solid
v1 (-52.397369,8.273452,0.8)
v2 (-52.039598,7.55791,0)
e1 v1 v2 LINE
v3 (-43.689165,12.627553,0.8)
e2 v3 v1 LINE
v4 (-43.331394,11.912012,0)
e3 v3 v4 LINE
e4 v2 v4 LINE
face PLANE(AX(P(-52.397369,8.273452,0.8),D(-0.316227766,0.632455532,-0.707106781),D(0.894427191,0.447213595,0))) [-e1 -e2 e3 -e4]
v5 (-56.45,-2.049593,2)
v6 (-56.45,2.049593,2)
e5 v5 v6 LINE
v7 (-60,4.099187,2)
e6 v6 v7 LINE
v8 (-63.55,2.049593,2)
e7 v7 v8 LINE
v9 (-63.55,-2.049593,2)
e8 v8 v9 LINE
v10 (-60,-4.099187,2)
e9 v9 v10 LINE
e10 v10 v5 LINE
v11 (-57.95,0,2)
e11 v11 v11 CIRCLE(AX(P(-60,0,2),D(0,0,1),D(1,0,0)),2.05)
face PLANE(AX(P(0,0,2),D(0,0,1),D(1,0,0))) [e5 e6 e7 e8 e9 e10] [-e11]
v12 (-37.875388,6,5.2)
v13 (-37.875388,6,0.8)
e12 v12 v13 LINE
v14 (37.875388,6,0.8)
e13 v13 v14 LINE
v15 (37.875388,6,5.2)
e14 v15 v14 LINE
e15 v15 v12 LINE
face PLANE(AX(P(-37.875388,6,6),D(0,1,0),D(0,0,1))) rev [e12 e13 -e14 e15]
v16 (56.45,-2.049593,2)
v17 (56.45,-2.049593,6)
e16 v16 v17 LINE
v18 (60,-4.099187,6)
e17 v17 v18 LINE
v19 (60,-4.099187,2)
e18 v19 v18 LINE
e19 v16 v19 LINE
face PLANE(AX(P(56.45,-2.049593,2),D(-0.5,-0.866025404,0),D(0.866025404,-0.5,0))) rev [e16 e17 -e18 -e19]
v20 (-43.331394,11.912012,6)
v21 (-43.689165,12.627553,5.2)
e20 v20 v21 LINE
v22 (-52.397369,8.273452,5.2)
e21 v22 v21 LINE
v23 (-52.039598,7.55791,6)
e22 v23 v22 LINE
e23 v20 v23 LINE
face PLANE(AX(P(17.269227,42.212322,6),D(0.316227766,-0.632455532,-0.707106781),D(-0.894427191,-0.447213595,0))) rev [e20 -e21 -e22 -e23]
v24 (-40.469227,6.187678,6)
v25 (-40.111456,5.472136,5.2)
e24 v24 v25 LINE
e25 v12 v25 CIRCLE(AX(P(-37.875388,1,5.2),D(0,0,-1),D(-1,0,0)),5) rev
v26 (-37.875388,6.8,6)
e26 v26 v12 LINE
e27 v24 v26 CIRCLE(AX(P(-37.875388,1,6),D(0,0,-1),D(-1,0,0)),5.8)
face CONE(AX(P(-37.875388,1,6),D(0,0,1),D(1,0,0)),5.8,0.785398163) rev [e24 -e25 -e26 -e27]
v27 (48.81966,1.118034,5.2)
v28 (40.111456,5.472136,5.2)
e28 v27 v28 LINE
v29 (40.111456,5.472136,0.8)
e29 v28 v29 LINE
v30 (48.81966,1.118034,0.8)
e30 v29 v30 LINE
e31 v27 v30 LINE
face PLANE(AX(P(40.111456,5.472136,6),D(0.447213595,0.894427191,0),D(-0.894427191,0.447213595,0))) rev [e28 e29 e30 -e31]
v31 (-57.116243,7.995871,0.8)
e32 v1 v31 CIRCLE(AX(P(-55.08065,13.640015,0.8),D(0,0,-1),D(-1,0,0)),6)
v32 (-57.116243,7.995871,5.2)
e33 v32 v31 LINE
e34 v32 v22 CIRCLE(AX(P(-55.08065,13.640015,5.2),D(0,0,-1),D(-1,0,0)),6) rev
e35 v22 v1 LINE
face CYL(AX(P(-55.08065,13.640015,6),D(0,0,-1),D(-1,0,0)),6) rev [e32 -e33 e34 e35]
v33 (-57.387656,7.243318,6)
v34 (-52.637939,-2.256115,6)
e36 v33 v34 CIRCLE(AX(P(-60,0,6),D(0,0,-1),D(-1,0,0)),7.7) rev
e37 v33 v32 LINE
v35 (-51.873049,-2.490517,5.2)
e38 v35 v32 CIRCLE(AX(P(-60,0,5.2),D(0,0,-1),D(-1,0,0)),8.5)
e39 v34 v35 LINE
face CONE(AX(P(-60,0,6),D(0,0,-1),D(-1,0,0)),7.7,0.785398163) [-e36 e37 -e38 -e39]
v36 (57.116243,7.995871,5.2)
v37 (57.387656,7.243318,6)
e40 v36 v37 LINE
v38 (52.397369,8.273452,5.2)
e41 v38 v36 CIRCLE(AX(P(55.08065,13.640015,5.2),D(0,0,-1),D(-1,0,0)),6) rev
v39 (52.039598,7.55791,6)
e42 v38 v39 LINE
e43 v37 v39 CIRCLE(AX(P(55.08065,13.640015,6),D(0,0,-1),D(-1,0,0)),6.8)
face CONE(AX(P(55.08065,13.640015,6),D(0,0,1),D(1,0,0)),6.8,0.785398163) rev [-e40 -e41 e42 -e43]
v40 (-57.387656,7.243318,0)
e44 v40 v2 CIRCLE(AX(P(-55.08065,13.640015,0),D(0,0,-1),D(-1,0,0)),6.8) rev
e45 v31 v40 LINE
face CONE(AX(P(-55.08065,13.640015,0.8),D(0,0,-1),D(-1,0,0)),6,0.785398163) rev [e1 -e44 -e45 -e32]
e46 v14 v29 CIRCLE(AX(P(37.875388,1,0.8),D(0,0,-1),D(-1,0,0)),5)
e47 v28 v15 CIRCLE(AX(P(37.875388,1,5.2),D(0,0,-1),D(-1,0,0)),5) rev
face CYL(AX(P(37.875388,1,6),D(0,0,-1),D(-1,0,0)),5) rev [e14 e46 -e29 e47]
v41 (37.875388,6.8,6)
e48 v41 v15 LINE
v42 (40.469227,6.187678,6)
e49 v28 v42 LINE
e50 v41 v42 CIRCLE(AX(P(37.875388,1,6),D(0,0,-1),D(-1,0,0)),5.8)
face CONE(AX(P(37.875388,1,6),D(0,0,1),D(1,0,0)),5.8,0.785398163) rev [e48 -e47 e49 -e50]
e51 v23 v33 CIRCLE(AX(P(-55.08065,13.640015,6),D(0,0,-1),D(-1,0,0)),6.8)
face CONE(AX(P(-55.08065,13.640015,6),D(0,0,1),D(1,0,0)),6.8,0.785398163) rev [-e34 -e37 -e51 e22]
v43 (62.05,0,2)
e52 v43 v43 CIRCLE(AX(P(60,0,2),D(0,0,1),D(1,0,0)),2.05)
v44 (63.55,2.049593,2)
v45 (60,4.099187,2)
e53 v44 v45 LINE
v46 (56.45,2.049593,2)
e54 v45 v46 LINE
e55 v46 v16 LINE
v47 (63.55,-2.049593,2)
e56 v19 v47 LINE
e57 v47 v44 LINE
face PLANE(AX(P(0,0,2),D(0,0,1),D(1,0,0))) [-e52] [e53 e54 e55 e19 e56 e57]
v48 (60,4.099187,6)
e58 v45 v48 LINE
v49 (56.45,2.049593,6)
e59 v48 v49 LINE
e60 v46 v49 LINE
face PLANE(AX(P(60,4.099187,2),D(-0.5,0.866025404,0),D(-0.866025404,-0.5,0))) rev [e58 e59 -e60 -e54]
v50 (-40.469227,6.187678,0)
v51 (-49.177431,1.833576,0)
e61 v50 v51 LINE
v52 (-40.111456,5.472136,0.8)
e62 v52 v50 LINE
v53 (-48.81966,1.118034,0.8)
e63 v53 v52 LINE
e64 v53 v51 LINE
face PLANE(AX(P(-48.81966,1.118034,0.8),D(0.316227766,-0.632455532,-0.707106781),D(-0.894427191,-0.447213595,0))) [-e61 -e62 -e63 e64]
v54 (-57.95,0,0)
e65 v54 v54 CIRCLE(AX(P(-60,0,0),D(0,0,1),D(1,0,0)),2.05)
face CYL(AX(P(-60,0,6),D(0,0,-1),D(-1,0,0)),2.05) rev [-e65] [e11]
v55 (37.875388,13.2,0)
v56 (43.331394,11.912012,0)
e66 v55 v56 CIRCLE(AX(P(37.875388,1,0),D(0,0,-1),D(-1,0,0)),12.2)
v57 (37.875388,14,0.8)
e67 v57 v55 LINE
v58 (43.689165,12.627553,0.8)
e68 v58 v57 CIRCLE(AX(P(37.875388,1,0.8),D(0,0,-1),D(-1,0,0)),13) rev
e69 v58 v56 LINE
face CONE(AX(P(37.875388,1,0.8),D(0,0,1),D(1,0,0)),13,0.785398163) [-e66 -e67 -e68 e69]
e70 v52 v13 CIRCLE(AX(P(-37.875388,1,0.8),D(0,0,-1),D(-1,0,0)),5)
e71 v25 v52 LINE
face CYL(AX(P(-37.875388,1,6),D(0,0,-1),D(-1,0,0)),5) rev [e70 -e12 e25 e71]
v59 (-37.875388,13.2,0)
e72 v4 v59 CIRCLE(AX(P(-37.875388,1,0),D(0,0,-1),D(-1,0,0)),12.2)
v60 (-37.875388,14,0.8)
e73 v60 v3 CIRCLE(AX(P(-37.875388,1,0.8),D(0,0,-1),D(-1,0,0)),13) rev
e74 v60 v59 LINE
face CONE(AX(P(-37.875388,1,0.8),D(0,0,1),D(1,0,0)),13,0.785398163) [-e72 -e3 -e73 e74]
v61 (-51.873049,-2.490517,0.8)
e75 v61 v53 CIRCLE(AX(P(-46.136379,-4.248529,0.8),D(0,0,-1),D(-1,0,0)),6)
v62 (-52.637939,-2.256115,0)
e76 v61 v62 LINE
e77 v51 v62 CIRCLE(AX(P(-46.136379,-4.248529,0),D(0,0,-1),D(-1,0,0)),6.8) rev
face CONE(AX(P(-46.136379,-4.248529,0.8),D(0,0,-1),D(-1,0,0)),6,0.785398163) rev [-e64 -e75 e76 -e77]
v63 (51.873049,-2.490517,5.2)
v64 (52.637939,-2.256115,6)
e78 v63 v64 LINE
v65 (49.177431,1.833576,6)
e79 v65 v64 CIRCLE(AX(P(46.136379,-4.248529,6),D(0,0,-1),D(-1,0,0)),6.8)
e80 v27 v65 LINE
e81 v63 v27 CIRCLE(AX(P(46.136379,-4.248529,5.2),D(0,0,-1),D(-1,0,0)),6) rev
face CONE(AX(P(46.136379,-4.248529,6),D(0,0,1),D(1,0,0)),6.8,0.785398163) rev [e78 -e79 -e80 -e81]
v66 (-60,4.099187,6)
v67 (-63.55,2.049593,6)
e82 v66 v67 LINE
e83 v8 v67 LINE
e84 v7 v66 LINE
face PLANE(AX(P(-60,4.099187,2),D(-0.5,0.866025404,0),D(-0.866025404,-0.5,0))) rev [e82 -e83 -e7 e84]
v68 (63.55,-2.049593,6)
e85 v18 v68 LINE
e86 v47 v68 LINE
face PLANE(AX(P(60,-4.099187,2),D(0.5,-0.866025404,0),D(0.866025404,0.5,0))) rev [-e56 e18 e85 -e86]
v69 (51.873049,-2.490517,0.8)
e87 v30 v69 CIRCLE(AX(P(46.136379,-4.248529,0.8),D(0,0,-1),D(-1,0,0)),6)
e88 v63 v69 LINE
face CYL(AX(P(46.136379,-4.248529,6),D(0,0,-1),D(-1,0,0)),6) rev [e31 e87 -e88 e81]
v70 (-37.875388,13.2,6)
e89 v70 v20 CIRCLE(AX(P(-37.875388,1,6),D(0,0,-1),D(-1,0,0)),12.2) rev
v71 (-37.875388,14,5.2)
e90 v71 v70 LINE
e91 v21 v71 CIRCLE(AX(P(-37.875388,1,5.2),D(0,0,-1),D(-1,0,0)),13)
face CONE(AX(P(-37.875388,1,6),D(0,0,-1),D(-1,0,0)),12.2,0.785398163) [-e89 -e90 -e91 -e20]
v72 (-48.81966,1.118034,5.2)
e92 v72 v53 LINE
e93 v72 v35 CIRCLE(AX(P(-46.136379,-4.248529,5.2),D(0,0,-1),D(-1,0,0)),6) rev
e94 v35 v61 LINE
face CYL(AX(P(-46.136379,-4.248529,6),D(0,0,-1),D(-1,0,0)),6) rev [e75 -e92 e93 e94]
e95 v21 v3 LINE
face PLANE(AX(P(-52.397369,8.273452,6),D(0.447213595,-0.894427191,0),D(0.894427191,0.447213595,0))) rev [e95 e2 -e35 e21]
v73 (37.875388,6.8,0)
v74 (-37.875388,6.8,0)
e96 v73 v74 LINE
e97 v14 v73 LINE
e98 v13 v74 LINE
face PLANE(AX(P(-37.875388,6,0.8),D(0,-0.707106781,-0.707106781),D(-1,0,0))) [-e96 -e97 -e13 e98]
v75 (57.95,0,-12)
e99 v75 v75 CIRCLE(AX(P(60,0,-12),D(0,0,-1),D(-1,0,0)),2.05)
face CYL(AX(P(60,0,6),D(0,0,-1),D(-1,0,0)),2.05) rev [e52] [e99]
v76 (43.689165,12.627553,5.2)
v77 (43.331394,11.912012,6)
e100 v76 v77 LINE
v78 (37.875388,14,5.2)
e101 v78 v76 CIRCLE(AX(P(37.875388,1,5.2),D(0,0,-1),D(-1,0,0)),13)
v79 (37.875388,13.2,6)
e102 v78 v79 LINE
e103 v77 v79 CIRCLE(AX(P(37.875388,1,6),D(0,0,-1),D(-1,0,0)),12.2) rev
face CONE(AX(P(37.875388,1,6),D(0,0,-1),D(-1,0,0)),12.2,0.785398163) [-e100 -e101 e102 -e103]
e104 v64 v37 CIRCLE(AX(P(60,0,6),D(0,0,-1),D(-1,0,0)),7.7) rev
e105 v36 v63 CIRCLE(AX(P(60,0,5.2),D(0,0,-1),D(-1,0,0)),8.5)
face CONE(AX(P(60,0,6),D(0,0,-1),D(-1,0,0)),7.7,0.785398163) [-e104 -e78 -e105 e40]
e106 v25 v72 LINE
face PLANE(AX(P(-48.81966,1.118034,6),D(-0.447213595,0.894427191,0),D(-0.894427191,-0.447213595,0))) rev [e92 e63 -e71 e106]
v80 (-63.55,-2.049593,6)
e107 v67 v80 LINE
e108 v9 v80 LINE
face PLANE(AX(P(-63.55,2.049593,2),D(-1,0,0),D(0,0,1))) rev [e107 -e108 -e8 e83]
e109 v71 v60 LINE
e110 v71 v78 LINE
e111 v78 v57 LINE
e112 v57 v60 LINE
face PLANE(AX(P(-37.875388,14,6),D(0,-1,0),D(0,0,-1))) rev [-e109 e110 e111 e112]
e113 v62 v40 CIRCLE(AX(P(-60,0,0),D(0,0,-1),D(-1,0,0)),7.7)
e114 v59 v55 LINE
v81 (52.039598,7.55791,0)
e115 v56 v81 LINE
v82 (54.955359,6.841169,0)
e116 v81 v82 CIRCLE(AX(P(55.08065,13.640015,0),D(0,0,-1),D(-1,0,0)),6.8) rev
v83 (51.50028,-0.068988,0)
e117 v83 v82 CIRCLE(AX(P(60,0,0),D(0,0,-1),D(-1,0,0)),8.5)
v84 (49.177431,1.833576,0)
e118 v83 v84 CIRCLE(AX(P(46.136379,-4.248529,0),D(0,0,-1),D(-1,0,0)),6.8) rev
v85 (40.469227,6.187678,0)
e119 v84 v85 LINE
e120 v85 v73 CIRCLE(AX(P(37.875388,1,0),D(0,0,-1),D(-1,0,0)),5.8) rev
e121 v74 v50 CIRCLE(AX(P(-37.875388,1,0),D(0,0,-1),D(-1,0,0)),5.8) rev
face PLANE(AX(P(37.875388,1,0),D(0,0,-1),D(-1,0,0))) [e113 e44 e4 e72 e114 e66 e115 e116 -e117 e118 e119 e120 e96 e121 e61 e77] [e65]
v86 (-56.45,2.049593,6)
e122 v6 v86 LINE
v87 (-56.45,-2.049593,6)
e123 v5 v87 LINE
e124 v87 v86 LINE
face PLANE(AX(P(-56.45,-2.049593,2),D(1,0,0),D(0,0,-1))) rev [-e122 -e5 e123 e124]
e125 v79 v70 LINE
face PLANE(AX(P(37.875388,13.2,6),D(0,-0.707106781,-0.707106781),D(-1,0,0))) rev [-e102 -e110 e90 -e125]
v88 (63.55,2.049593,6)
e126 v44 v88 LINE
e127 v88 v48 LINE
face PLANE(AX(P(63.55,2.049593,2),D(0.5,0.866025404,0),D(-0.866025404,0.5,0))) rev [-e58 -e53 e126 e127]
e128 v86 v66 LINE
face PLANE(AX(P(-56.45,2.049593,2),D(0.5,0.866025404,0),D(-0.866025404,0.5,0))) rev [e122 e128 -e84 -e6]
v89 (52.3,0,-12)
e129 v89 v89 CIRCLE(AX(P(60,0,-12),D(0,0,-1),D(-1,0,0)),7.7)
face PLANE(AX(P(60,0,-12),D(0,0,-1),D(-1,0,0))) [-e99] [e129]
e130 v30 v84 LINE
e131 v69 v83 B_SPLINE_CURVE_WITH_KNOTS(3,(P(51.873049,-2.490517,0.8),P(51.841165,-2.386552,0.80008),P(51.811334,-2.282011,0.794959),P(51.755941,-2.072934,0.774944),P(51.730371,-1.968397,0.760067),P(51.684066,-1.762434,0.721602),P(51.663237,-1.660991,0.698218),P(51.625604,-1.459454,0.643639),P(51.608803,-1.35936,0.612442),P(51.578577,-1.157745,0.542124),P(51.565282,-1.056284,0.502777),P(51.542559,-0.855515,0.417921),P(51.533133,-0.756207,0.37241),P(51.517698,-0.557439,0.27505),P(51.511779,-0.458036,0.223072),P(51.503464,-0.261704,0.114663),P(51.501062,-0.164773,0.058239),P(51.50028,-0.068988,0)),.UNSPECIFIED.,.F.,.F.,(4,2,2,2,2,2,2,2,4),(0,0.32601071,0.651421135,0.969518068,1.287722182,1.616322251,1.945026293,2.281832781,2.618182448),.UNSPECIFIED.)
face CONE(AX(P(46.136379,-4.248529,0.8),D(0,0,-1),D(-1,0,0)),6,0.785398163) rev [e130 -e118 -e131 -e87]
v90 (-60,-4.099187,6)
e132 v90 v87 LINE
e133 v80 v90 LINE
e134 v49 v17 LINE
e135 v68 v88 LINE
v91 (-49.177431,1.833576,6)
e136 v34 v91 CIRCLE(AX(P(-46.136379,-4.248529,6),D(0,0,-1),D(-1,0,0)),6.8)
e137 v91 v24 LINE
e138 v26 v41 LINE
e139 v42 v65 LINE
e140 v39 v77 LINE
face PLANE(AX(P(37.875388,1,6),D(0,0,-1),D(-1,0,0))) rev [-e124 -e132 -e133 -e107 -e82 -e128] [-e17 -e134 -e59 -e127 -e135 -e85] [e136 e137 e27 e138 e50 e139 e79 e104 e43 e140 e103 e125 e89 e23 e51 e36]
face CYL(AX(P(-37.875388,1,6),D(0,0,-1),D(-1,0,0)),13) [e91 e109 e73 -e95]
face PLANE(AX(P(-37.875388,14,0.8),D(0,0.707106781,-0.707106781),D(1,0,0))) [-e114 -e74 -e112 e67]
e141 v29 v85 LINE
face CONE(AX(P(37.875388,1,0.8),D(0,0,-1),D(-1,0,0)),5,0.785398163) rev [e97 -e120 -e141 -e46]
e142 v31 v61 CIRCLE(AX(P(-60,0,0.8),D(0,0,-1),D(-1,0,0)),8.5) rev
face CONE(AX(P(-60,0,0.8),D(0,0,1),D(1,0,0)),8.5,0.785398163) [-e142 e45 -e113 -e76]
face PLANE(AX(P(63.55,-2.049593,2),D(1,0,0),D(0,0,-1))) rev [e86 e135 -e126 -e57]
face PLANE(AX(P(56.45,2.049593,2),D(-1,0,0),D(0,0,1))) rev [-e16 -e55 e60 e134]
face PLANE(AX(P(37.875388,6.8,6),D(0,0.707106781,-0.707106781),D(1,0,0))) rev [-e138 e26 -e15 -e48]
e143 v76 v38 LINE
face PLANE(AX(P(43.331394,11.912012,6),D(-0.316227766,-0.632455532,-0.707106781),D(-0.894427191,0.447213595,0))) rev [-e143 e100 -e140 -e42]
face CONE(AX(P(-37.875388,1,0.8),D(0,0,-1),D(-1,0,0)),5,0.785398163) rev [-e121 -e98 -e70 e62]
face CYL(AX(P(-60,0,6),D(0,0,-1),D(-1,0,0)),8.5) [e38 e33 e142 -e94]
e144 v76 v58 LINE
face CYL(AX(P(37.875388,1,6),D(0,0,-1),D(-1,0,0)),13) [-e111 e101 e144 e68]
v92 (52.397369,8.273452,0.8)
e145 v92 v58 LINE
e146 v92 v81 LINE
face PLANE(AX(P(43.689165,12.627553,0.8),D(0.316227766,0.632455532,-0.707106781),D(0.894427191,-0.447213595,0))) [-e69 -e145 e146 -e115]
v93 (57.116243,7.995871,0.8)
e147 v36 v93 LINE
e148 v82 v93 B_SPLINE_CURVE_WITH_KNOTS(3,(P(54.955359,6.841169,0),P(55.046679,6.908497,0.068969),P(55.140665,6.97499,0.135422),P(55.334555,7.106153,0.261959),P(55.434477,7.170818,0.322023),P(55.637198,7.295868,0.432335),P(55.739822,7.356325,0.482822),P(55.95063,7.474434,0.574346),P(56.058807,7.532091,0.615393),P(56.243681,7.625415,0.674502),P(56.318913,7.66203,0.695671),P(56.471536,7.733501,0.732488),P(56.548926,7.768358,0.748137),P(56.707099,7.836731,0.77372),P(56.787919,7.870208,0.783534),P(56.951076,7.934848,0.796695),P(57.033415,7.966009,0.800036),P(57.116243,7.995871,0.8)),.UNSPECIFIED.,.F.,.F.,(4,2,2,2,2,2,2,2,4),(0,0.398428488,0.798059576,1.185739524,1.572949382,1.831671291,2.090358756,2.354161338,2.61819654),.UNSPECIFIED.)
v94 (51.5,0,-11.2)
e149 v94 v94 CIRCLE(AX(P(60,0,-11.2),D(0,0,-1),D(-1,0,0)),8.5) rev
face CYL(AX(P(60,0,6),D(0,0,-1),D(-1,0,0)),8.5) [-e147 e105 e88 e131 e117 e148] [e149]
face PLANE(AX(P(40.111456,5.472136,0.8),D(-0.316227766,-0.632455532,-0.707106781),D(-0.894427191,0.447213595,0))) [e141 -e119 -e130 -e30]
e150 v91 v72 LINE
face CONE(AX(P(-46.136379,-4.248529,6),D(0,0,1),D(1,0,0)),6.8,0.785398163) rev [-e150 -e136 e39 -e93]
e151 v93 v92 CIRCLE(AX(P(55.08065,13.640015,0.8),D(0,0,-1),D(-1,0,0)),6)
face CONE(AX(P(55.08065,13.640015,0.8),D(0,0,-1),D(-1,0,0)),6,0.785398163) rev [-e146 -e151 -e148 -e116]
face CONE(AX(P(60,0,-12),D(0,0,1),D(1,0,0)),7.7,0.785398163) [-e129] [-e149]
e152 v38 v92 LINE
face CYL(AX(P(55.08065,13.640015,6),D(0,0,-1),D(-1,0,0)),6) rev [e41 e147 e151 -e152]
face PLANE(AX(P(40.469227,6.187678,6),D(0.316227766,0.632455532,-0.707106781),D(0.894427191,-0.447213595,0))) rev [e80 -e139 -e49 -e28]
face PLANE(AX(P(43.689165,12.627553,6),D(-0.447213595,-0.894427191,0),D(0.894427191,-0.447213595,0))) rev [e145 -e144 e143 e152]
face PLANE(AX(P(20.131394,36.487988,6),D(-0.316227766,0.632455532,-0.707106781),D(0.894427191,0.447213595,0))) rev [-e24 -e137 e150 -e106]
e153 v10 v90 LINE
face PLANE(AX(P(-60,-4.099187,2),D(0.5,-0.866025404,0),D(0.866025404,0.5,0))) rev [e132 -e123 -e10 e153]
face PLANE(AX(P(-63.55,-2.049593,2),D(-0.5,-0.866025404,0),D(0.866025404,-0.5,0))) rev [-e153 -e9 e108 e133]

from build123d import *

# Parameters (mm, degrees)
SKETCH1_R                = 2.05
BOSS_EXTRUDE1_DEPTH      = 6
CUT_EXTRUDE1_DEPTH       = 4
BOSS_EXTRUDE2_DEPTH      = 12
BOSS_EXTRUDE2_DEPTH_BACK = 1
SKETCH4_R                = 8.5
SKETCH4_R_2              = 2.05
CHAMFER3_SIZE            = 0.8


with BuildPart() as part:
    # Sketch1 → Boss-Extrude1 (new body)
    with BuildSketch(Plane.XY):
        with BuildLine():
            Line((-52.397368877, 8.273451517), (-43.689164944, 12.627553483))
            ThreePointArc((-43.689164944, 12.627553483), (-40.86217617, 13.652236863), (-37.875388203, 14))
            Line((-37.875388203, 14), (37.875388203, 14))
            ThreePointArc((37.875388203, 14), (40.86217617, 13.652236863), (43.689164944, 12.627553483))
            Line((43.689164944, 12.627553483), (52.397368877, 8.273451517))
            ThreePointArc((52.397368877, 8.273451517), (54.728318318, 7.650368424), (57.116243367, 7.995870664))
            ThreePointArc((57.116243367, 7.995870664), (67.602631123, -3.801315562), (51.873049489, -2.490517092))
            ThreePointArc((51.873049489, -2.490517092), (50.716696252, -0.372875708), (48.819660113, 1.118033989))
            Line((48.819660113, 1.118033989), (40.11145618, 5.472135955))
            ThreePointArc((40.11145618, 5.472135955), (39.024152805, 5.866244947), (37.875388203, 6))
            Line((37.875388203, 6), (-37.875388203, 6))
            ThreePointArc((-37.875388203, 6), (-39.024152805, 5.866244947), (-40.11145618, 5.472135955))
            Line((-40.11145618, 5.472135955), (-48.819660113, 1.118033989))
            ThreePointArc((-48.819660113, 1.118033989), (-50.716696252, -0.372875708), (-51.873049489, -2.490517092))
            ThreePointArc((-51.873049489, -2.490517092), (-67.602631123, -3.801315562), (-57.116243367, 7.995870664))
            ThreePointArc((-57.116243367, 7.995870664), (-54.728318318, 7.650368424), (-52.397368877, 8.273451517))
        make_face()
        with Locations((-60, 0)):
            Circle(SKETCH1_R, mode=Mode.SUBTRACT)
        with Locations((60, 0)):
            Circle(SKETCH1_R, mode=Mode.SUBTRACT)
    extrude(amount=BOSS_EXTRUDE1_DEPTH)

    # Sketch3 → Cut-Extrude1 (cut)
    with BuildSketch(Plane.XY.offset(6)):
        Polygon((-60, 4.099186911), (-63.55, 2.049593456), (-63.55, -2.049593456), (-60, -4.099186911), (-56.45, -2.049593456), (-56.45, 2.049593456), align=None)
        Polygon((60, 4.099186911), (56.45, 2.049593456), (56.45, -2.049593456), (60, -4.099186911), (63.55, -2.049593456), (63.55, 2.049593456), align=None)
    extrude(amount=-CUT_EXTRUDE1_DEPTH, mode=Mode.SUBTRACT)

    # Sketch4 → Boss-Extrude2 (add, two sides: drawn at the far end of the back side and taken through both)
    with BuildSketch(Plane(origin=(0, 0, 0), x_dir=(-1, 0, 0), z_dir=(0, 0, -1)).offset(-BOSS_EXTRUDE2_DEPTH_BACK)):
        with Locations((-60, 0)):
            Circle(SKETCH4_R)
        with Locations((-60, 0)):
            Circle(SKETCH4_R_2, mode=Mode.SUBTRACT)
    extrude(amount=BOSS_EXTRUDE2_DEPTH + BOSS_EXTRUDE2_DEPTH_BACK)

    # Chamfer3
    # the kernel refuses this chamfer: 0.8 mm, written as the material it adds along each edge
    # the kernel refuses this chamfer: 0.8 mm, written as the material it takes off along each edge
    with BuildSketch(Plane(origin=(37.875388203, 1, 0), x_dir=(0.44721359549995965, 0.894427190999915, 0), z_dir=(0.894427190999915, -0.44721359549995965, 0))) as chamfer3_2_piece_1:
        Polygon((5, CHAMFER3_SIZE), (5 + CHAMFER3_SIZE, 0), (5, 0), align=None)
    revolve(axis=Axis((37.875388203, 1, 0), (0, 0, 1)), revolution_arc=26.565051177, mode=Mode.SUBTRACT)
    with BuildSketch(Plane(origin=(48.819660113, 1.118033989, 0), x_dir=(-0.012296529840444168, -0.024593059680888388, 0.9996219169112966), z_dir=(-0.8944271909999163, 0.44721359549995715, 0)), Plane(origin=(-40.11145618, 5.472135955, 0), x_dir=(0.01229652984044405, -0.02459305968088818, 0.9996219169112966), z_dir=(-0.8944271909999165, -0.4472135954999568, 0)), Plane(origin=(43.689164944, 12.627553483, 0), x_dir=(0.012296529840444093, 0.02459305968088816, 0.9996219169112966), z_dir=(0.8944271909999156, -0.44721359549995837, 0)), Plane(origin=(48.819660113, 1.118033989, 6), x_dir=(0.4470445116024604, 0.8940890232049228, 0.02749587661058619), z_dir=(-0.8944271909999163, 0.44721359549995715, 0)), Plane(origin=(-40.11145618, 5.472135955, 6), x_dir=(-0.4470445116024601, 0.8940890232049231, 0.02749587661058619), z_dir=(-0.8944271909999165, -0.4472135954999568, 0)), Plane(origin=(43.689164944, 12.627553483, 6), x_dir=(-0.4470445116024617, -0.8940890232049222, 0.027495876610586216), z_dir=(0.8944271909999156, -0.44721359549995837, 0)), Plane(origin=(-52.397368877, 8.273451517, 6), x_dir=(0.44704451160246106, -0.8940890232049225, 0.027495876610586212), z_dir=(0.894427190999916, 0.4472135954999578, 0))) as chamfer3_2_piece_2:
        Polygon((CHAMFER3_SIZE * 0.999621916911, CHAMFER3_SIZE * 0.0274958766106), (-CHAMFER3_SIZE * 0.0274958766106, CHAMFER3_SIZE * 0.999621916911), (0, 0), align=None)
    extrude(amount=9.736067977, mode=Mode.SUBTRACT)
    with BuildSketch(Plane(origin=(37.875388203, 6, 0), x_dir=(0, -0.027495876610586275, 0.9996219169112968), z_dir=(-1, 0, 0)), Plane(origin=(-37.875388203, 14, 0), x_dir=(0, 0.02749587661058735, 0.9996219169112966), z_dir=(1, 0, 0)), Plane(origin=(37.875388203, 6, 6), x_dir=(0, 0.9996219169112968, 0.027495876610586285), z_dir=(-1, 0, 0)), Plane(origin=(-37.875388203, 14, 6), x_dir=(0, -0.9996219169112968, 0.027495876610586226), z_dir=(1, 0, 0))) as chamfer3_2_piece_3:
        Polygon((CHAMFER3_SIZE * 0.999621916911, CHAMFER3_SIZE * 0.0274958766106), (-CHAMFER3_SIZE * 0.0274958766106, CHAMFER3_SIZE * 0.999621916911), (0, 0), align=None)
    extrude(amount=75.750776405, mode=Mode.SUBTRACT)
    with BuildSketch(Plane(origin=(46.13637854, -4.248529157, 0), x_dir=(0.9989622079668251, -0.04554675678954209, 0), z_dir=(-0.04554675678954209, -0.9989622079668251, 0))) as chamfer3_2_piece_4_section:
        Polygon((6, CHAMFER3_SIZE), (6 + CHAMFER3_SIZE, 0), (6, 0), align=None)
    chamfer3_2_piece_4 = revolve(axis=Axis((46.13637854, -4.248529157, 0), (0, 0, 1)), revolution_arc=66.045488886, mode=Mode.PRIVATE)
    chamfer3_2_piece_4 = chamfer3_2_piece_4 - Plane(origin=(60, 0, 0.316419024), x_dir=(-1, 0, 0), z_dir=(0, 0, 1)) * Cylinder(8.5, 28, mode=Mode.PRIVATE)
    add(chamfer3_2_piece_4, mode=Mode.SUBTRACT)
    with BuildSketch(Plane(origin=(-37.875388203, 1, 0), x_dir=(0, 1, 0), z_dir=(1, 0, 0))) as chamfer3_2_piece_5:
        Polygon((5, CHAMFER3_SIZE), (5 + CHAMFER3_SIZE, 0), (5, 0), align=None)
    revolve(axis=Axis((-37.875388203, 1, 0), (0, 0, 1)), revolution_arc=26.565051177, mode=Mode.SUBTRACT)
    with BuildSketch(Plane(origin=(55.08065045, 13.640014663, 0), x_dir=(-0.44721359549995726, -0.8944271909999163, 0), z_dir=(-0.8944271909999163, 0.44721359549995726, 0))) as chamfer3_2_piece_6_section:
        Polygon((6, CHAMFER3_SIZE), (6 + CHAMFER3_SIZE, 0), (6, 0), align=None)
    chamfer3_2_piece_6 = revolve(axis=Axis((55.08065045, 13.640014663, 0), (0, 0, 1)), revolution_arc=66.045488886, mode=Mode.PRIVATE)
    chamfer3_2_piece_6 = chamfer3_2_piece_6 - Plane(origin=(60, 0, 0.316418933), x_dir=(-1, 0, 0), z_dir=(0, 0, 1)) * Cylinder(8.5, 28, mode=Mode.PRIVATE)
    add(chamfer3_2_piece_6, mode=Mode.SUBTRACT)
    with BuildSketch(Plane(origin=(-46.13637854, -4.248529157, 0), x_dir=(-0.4472135954999641, 0.8944271909999129, 0), z_dir=(0.8944271909999129, 0.4472135954999641, 0))) as chamfer3_2_piece_7:
        Polygon((6, CHAMFER3_SIZE), (6 + CHAMFER3_SIZE, 0), (6, 0), align=None)
    revolve(axis=Axis((-46.13637854, -4.248529157, 0), (0, 0, 1)), revolution_arc=46.397181027, mode=Mode.SUBTRACT)
    with BuildSketch(Plane(origin=(-60, 0, 0), x_dir=(0.9561118248619797, -0.29300201084479827, 0), z_dir=(0.29300201084479827, 0.9561118248619797, 0))) as chamfer3_2_piece_8:
        Polygon((8.5 - CHAMFER3_SIZE, 0), (8.5, -CHAMFER3_SIZE), (8.5, 0), align=None)
    revolve(axis=Axis((-60, 0, 0), (0, 0, -1)), revolution_arc=272.794362055, mode=Mode.SUBTRACT)
    with BuildSketch(Plane(origin=(37.875388203, 1, 0), x_dir=(0, 1, 0), z_dir=(-1, 0, 0))) as chamfer3_2_piece_9:
        Polygon((13, -CHAMFER3_SIZE), (13 - CHAMFER3_SIZE, 0), (13, 0), align=None)
    revolve(axis=Axis((37.875388203, 1, 0), (0, 0, -1)), revolution_arc=26.565051177, mode=Mode.SUBTRACT)
    with BuildSketch(Plane(origin=(-55.08065045, 13.640014663, 0), x_dir=(-0.3392654862413453, -0.940690666396464, 0), z_dir=(-0.940690666396464, 0.3392654862413453, 0))) as chamfer3_2_piece_10:
        Polygon((6, CHAMFER3_SIZE), (6 + CHAMFER3_SIZE, 0), (6, 0), align=None)
    revolve(axis=Axis((-55.08065045, 13.640014663, 0), (0, 0, 1)), revolution_arc=46.397181027, mode=Mode.SUBTRACT)
    with BuildSketch(Plane(origin=(-52.397368877, 8.273451517, 0), x_dir=(0.44704451160246106, -0.8940890232049225, -0.027495876610586303), z_dir=(0.894427190999916, 0.4472135954999578, 0))) as chamfer3_2_piece_11:
        Polygon((CHAMFER3_SIZE * 0.999621916911, -CHAMFER3_SIZE * 0.0274958766106), (-CHAMFER3_SIZE * 0.0274958766106, -CHAMFER3_SIZE * 0.999621916911), (0, 0), align=None)
    extrude(amount=9.736067977, mode=Mode.SUBTRACT)
    with BuildSketch(Plane(origin=(-37.875388203, 1, 0), x_dir=(-0.4472135954999576, 0.894427190999916, 0), z_dir=(-0.894427190999916, -0.4472135954999576, 0))) as chamfer3_2_piece_12:
        Polygon((13, -CHAMFER3_SIZE), (13 - CHAMFER3_SIZE, 0), (13, 0), align=None)
    revolve(axis=Axis((-37.875388203, 1, 0), (0, 0, -1)), revolution_arc=26.565051177, mode=Mode.SUBTRACT)
    with BuildSketch(Plane(origin=(37.875388203, 1, 6), x_dir=(0.44721359549995965, 0.894427190999915, 0), z_dir=(0.894427190999915, -0.44721359549995965, 0))) as chamfer3_2_piece_13:
        Polygon((5 + CHAMFER3_SIZE, 0), (5, -CHAMFER3_SIZE), (5, 0), align=None)
    revolve(axis=Axis((37.875388203, 1, 6), (0, 0, 1)), revolution_arc=26.565051177, mode=Mode.SUBTRACT)
    with BuildSketch(Plane(origin=(46.13637854, -4.248529157, 6), x_dir=(0.956111824861979, 0.2930020108448003, 0), z_dir=(0.2930020108448003, -0.956111824861979, 0))) as chamfer3_2_piece_14:
        Polygon((6 + CHAMFER3_SIZE, 0), (6, -CHAMFER3_SIZE), (6, 0), align=None)
    revolve(axis=Axis((46.13637854, -4.248529157, 6), (0, 0, 1)), revolution_arc=46.397181027, mode=Mode.SUBTRACT)
    with BuildSketch(Plane(origin=(-37.875388203, 1, 6), x_dir=(0, 1, 0), z_dir=(1, 0, 0))) as chamfer3_2_piece_15:
        Polygon((5 + CHAMFER3_SIZE, 0), (5, -CHAMFER3_SIZE), (5, 0), align=None)
    revolve(axis=Axis((-37.875388203, 1, 6), (0, 0, 1)), revolution_arc=26.565051177, mode=Mode.SUBTRACT)
    with BuildSketch(Plane(origin=(60, 0, 6), x_dir=(-0.3392654862413484, 0.9406906663964629, 0), z_dir=(-0.9406906663964629, -0.3392654862413484, 0))) as chamfer3_2_piece_16:
        Polygon((8.5 - CHAMFER3_SIZE, 0), (8.5, CHAMFER3_SIZE), (8.5, 0), align=None)
    revolve(axis=Axis((60, 0, 6), (0, 0, -1)), revolution_arc=272.794362055, mode=Mode.SUBTRACT)
    with BuildSketch(Plane(origin=(55.08065045, 13.640014663, 6), x_dir=(-0.44721359549995726, -0.8944271909999163, 0), z_dir=(-0.8944271909999163, 0.44721359549995726, 0))) as chamfer3_2_piece_17:
        Polygon((6 + CHAMFER3_SIZE, 0), (6, -CHAMFER3_SIZE), (6, 0), align=None)
    revolve(axis=Axis((55.08065045, 13.640014663, 6), (0, 0, 1)), revolution_arc=46.397181027, mode=Mode.SUBTRACT)
    with BuildSketch(Plane(origin=(-46.13637854, -4.248529157, 6), x_dir=(-0.4472135954999641, 0.8944271909999129, 0), z_dir=(0.8944271909999129, 0.4472135954999641, 0))) as chamfer3_2_piece_18:
        Polygon((6 + CHAMFER3_SIZE, 0), (6, -CHAMFER3_SIZE), (6, 0), align=None)
    revolve(axis=Axis((-46.13637854, -4.248529157, 6), (0, 0, 1)), revolution_arc=46.397181027, mode=Mode.SUBTRACT)
    with BuildSketch(Plane(origin=(-60, 0, 6), x_dir=(0.9561118248619797, -0.29300201084479827, 0), z_dir=(0.29300201084479827, 0.9561118248619797, 0))) as chamfer3_2_piece_19:
        Polygon((8.5 - CHAMFER3_SIZE, 0), (8.5, CHAMFER3_SIZE), (8.5, 0), align=None)
    revolve(axis=Axis((-60, 0, 6), (0, 0, -1)), revolution_arc=272.794362055, mode=Mode.SUBTRACT)
    with BuildSketch(Plane(origin=(37.875388203, 1, 6), x_dir=(0, 1, 0), z_dir=(-1, 0, 0))) as chamfer3_2_piece_20:
        Polygon((13 - CHAMFER3_SIZE, 0), (13, CHAMFER3_SIZE), (13, 0), align=None)
    revolve(axis=Axis((37.875388203, 1, 6), (0, 0, -1)), revolution_arc=26.565051177, mode=Mode.SUBTRACT)
    with BuildSketch(Plane(origin=(-55.08065045, 13.640014663, 6), x_dir=(-0.3392654862413453, -0.940690666396464, 0), z_dir=(-0.940690666396464, 0.3392654862413453, 0))) as chamfer3_2_piece_21:
        Polygon((6, -CHAMFER3_SIZE), (6 + CHAMFER3_SIZE, 0), (6, 0), align=None)
    revolve(axis=Axis((-55.08065045, 13.640014663, 6), (0, 0, 1)), revolution_arc=46.397181027, mode=Mode.SUBTRACT)
    with BuildSketch(Plane(origin=(-37.875388203, 1, 6), x_dir=(-0.4472135954999576, 0.894427190999916, 0), z_dir=(-0.894427190999916, -0.4472135954999576, 0))) as chamfer3_2_piece_22:
        Polygon((13 - CHAMFER3_SIZE, 0), (13, CHAMFER3_SIZE), (13, 0), align=None)
    revolve(axis=Axis((-37.875388203, 1, 6), (0, 0, -1)), revolution_arc=26.565051177, mode=Mode.SUBTRACT)
    with BuildSketch(Plane(origin=(60, 0, -12), x_dir=(-1, 0, 0), z_dir=(0, -1, 0))) as chamfer3_2_piece_23:
        Polygon((8.5 - CHAMFER3_SIZE, 0), (8.5, -CHAMFER3_SIZE), (8.5, 0), align=None)
    revolve(axis=Axis((60, 0, -12), (0, 0, -1)), mode=Mode.SUBTRACT)


solid = part.part
